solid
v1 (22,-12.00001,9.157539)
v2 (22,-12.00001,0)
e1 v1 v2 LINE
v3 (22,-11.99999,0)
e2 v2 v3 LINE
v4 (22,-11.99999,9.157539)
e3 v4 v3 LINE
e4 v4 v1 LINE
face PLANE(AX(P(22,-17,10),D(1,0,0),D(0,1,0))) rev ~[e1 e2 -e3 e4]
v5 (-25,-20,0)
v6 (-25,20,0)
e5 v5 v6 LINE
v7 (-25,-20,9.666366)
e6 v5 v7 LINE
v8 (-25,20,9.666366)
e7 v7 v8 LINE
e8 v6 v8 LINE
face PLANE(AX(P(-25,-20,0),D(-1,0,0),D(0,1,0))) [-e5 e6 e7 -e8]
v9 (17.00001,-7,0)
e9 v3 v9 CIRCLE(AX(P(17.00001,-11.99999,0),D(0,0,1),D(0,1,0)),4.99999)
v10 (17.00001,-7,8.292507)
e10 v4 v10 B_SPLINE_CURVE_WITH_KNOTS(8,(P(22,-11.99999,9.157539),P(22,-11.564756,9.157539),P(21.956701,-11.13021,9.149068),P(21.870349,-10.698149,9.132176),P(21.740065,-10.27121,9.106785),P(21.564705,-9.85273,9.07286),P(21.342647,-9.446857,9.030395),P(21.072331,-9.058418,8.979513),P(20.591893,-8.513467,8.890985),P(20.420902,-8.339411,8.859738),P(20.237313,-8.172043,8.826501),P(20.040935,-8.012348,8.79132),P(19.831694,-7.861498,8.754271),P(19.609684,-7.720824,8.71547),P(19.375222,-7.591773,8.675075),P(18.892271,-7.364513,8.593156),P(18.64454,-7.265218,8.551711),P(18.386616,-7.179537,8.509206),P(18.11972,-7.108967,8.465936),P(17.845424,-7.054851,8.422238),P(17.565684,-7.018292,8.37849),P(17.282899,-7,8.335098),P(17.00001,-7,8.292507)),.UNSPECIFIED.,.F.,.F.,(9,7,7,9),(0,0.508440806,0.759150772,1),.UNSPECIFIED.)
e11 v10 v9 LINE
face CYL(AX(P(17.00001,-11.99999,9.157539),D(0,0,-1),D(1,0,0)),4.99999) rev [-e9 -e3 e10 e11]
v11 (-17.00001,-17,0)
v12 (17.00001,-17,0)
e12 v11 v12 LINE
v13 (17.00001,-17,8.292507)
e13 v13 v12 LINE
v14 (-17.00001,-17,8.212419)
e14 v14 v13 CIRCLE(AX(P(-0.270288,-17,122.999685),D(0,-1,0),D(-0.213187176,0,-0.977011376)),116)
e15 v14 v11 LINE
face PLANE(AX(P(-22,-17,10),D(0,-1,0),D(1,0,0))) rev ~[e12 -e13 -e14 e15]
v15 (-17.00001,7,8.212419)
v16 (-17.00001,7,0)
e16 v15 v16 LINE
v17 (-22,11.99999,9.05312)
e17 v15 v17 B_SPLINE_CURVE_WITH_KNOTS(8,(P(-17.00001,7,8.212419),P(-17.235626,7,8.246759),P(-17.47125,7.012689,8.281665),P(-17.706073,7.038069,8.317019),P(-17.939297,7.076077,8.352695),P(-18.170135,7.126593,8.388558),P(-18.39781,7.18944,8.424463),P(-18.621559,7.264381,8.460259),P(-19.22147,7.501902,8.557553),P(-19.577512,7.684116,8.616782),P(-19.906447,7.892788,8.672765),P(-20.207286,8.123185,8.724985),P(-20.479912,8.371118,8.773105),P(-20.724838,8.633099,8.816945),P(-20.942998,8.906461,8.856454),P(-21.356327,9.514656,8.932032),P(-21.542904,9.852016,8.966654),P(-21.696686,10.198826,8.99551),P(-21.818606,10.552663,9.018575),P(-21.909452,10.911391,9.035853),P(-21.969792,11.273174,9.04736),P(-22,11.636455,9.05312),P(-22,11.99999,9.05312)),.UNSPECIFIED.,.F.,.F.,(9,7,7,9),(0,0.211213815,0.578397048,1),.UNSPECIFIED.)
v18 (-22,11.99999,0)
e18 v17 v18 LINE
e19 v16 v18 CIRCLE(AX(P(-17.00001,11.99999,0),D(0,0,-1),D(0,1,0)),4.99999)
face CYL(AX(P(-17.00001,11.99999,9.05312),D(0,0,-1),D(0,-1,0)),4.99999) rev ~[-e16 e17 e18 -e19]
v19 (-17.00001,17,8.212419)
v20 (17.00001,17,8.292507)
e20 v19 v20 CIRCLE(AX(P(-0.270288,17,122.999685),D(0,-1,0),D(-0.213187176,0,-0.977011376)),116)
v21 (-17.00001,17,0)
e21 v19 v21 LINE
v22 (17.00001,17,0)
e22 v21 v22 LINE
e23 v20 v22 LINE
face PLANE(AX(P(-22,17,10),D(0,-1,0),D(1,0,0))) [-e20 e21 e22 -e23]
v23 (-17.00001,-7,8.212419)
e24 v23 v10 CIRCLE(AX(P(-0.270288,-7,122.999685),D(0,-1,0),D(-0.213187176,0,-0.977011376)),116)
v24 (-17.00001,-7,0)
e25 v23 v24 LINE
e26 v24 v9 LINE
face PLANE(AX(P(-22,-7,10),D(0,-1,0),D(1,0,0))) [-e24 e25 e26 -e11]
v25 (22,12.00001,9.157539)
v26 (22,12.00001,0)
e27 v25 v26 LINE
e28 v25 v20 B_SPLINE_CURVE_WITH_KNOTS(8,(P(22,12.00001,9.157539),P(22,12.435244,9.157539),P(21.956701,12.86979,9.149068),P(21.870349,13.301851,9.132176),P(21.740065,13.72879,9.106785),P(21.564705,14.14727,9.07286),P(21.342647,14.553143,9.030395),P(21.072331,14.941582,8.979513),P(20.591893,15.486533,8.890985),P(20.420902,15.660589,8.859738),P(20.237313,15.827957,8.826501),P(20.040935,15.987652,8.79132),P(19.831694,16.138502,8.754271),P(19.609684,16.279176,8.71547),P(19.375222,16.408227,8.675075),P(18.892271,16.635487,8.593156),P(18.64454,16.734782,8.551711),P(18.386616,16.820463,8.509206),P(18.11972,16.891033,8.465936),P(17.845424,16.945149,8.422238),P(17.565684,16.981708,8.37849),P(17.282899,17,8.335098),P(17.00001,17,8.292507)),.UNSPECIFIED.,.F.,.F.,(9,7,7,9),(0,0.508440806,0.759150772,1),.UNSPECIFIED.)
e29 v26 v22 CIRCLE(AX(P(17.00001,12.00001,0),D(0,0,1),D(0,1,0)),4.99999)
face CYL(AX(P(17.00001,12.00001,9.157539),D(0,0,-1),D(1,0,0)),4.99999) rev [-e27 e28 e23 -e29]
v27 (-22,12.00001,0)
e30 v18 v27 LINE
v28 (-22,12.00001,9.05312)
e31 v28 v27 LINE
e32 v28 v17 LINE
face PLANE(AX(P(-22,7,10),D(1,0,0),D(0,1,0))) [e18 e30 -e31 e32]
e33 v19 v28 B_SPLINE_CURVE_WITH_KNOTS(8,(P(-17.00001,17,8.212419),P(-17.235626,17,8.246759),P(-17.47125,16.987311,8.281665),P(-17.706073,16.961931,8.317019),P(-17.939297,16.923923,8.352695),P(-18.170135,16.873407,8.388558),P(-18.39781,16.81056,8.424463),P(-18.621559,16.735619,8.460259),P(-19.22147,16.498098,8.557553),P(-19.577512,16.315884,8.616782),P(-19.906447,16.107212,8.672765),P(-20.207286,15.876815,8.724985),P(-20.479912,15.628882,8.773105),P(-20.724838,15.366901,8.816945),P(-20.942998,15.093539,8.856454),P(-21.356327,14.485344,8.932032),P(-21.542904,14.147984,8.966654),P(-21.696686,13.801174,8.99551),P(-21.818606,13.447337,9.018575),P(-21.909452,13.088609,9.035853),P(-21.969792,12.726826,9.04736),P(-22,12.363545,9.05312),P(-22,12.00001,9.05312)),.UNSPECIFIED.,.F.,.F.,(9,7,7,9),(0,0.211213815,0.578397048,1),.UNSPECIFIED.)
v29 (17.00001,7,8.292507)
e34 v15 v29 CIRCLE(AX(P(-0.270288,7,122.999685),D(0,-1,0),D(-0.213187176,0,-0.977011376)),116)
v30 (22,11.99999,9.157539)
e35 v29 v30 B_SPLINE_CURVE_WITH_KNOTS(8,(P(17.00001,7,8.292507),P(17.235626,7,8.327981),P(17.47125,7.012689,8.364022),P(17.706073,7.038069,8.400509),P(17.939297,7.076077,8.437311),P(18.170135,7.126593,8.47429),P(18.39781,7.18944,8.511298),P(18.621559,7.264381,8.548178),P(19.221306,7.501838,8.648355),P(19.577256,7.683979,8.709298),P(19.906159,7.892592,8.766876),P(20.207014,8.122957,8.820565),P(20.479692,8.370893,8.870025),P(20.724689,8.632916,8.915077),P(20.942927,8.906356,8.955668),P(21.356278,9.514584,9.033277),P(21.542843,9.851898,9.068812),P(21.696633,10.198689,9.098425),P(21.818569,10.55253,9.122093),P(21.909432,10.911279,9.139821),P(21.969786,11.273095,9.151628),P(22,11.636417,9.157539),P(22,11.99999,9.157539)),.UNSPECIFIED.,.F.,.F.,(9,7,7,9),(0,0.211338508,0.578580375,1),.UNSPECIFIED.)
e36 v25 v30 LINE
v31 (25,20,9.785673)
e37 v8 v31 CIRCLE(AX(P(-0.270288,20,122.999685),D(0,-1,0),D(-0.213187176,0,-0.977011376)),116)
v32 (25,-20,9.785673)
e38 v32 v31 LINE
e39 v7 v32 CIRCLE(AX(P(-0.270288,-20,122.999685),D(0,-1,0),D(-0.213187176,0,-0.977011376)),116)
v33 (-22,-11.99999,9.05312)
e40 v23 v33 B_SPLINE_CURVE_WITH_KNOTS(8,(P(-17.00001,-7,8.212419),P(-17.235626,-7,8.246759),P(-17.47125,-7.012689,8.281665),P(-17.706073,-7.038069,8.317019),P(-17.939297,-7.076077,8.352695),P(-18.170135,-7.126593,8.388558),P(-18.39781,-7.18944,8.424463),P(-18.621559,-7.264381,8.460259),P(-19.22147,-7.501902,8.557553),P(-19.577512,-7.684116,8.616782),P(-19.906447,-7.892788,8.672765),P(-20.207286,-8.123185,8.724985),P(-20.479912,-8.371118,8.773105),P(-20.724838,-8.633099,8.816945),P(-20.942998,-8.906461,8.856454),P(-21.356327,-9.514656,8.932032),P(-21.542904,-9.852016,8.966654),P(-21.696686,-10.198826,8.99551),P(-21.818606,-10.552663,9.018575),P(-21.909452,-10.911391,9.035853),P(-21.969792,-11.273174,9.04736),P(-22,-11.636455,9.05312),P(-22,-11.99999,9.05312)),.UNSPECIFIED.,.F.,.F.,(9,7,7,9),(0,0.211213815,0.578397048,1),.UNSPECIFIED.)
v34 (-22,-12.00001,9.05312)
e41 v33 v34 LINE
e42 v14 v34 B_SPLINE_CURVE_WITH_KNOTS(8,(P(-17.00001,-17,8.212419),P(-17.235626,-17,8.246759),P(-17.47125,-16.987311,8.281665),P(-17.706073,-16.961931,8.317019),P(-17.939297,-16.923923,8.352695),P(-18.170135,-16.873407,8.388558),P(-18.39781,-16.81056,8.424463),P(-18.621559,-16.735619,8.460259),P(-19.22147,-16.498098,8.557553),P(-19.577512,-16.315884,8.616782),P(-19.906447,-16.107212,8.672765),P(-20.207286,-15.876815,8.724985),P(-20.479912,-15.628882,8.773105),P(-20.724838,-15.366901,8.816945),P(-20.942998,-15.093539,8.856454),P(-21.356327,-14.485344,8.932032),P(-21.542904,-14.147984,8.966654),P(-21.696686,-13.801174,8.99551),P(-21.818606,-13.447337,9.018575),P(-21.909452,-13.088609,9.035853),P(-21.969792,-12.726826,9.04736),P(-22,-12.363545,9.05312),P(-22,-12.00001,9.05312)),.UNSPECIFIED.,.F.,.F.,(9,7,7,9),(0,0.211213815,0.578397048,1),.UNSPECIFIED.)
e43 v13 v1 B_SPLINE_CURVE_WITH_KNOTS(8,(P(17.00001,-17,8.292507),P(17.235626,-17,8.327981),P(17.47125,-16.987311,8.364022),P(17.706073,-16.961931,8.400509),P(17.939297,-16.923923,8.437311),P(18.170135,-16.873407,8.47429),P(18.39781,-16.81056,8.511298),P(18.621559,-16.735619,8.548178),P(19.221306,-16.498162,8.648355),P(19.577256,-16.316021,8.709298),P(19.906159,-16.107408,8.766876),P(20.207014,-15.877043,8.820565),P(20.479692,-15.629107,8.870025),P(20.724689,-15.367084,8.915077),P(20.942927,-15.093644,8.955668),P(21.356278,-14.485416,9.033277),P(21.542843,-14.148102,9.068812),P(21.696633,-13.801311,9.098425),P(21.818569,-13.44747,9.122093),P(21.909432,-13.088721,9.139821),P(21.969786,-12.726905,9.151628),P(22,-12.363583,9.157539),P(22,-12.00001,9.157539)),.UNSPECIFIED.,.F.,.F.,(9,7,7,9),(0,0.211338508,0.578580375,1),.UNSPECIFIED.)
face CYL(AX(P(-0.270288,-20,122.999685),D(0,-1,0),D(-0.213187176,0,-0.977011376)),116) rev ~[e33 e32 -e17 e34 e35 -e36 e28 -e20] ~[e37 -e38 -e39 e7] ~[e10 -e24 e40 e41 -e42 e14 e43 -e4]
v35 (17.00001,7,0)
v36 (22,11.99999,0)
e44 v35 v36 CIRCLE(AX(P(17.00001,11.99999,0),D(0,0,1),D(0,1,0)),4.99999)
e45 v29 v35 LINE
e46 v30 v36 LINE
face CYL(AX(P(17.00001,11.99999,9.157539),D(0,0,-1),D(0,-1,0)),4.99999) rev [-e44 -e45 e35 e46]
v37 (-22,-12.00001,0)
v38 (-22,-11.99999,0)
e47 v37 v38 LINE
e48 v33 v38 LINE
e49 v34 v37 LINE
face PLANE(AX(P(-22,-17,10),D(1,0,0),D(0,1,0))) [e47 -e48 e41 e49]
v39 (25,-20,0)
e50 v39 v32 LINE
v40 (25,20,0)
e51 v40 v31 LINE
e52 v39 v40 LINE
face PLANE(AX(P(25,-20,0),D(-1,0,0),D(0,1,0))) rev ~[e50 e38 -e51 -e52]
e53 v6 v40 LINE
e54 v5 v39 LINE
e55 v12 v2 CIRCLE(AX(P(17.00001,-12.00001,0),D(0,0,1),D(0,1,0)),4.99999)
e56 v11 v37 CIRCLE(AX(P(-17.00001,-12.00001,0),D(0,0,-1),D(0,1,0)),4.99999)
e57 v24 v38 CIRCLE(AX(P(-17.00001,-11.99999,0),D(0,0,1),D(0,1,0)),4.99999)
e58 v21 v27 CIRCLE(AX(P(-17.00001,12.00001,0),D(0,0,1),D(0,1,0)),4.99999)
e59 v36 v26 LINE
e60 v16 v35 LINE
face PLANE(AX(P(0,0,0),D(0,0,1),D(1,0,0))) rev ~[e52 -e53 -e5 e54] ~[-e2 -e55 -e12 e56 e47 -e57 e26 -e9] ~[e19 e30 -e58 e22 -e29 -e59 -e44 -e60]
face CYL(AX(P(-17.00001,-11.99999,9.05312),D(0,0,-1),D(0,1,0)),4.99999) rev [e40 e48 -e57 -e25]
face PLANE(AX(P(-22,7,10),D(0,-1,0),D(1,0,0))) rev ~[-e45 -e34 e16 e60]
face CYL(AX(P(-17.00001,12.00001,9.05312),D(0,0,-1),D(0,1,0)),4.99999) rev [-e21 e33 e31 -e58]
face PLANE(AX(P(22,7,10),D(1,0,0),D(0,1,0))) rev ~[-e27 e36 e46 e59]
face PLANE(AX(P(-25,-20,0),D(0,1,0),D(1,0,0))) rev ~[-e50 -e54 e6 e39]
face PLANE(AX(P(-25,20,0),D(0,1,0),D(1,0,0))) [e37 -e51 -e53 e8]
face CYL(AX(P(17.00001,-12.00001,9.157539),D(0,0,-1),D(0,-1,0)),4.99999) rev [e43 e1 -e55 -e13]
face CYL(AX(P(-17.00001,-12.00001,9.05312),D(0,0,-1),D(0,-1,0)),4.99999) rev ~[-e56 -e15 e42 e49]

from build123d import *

# Parameters (mm, degrees)
F0_W     = 50
F0_H     = 40
F1_DEPTH = 10
F3_DEPTH = 40
F5_W     = 44
F5_H     = 10
F6_DEPTH = 18
F7_R     = 4.99999


# Not quite as in the source:
# - a fillet or chamfer is up to 0.001 mm smaller than in the source, because OpenCascade refuses the exact size


with BuildPart() as f1:
    # F0 (on Top) → F1 (new body)
    with BuildSketch(Plane.XY):
        Rectangle(F0_W, F0_H)
    extrude(amount=F1_DEPTH)

    # F2 (on face) → F3 (cut)
    with BuildSketch(Plane.XZ.offset(20)):
        with BuildLine():
            Line((-25, 10), (-25, 9.6663655309))
            ThreePointArc((-25, 9.6663655309), (0.0065046461, 7.0000153387), (25, 9.7856728837))
            Line((25, 9.7856728837), (25, 10))
            Line((25, 10), (-25, 10))
        make_face()
    extrude(amount=-F3_DEPTH, mode=Mode.SUBTRACT)

    # F5 (on offset) → F6 (cut)
    with BuildSketch(Plane.XY.offset(10)):
        with Locations((0, 12)):
            Rectangle(F5_W, F5_H)
        with Locations((0, -12)):
            Rectangle(F5_W, F5_H)
    extrude(amount=-F6_DEPTH, mode=Mode.SUBTRACT)

    # F7 (radius 5 in the source; OpenCascade refuses exactly that, so slightly less here)
    f7_edges = [f1.edges().sort_by_distance(p)[0] for p in [
        (-22, 17, 4.52656),
        (22, 17, 4.578769),
        (-22, -7, 4.52656),
        (22, -7, 4.578769),
        (-22, -17, 4.52656),
        (22, -17, 4.578769),
        (22, 7, 4.578769),
        (-22, 7, 4.52656),
    ]]
    fillet(f7_edges, radius=F7_R)


solid = f1.part
